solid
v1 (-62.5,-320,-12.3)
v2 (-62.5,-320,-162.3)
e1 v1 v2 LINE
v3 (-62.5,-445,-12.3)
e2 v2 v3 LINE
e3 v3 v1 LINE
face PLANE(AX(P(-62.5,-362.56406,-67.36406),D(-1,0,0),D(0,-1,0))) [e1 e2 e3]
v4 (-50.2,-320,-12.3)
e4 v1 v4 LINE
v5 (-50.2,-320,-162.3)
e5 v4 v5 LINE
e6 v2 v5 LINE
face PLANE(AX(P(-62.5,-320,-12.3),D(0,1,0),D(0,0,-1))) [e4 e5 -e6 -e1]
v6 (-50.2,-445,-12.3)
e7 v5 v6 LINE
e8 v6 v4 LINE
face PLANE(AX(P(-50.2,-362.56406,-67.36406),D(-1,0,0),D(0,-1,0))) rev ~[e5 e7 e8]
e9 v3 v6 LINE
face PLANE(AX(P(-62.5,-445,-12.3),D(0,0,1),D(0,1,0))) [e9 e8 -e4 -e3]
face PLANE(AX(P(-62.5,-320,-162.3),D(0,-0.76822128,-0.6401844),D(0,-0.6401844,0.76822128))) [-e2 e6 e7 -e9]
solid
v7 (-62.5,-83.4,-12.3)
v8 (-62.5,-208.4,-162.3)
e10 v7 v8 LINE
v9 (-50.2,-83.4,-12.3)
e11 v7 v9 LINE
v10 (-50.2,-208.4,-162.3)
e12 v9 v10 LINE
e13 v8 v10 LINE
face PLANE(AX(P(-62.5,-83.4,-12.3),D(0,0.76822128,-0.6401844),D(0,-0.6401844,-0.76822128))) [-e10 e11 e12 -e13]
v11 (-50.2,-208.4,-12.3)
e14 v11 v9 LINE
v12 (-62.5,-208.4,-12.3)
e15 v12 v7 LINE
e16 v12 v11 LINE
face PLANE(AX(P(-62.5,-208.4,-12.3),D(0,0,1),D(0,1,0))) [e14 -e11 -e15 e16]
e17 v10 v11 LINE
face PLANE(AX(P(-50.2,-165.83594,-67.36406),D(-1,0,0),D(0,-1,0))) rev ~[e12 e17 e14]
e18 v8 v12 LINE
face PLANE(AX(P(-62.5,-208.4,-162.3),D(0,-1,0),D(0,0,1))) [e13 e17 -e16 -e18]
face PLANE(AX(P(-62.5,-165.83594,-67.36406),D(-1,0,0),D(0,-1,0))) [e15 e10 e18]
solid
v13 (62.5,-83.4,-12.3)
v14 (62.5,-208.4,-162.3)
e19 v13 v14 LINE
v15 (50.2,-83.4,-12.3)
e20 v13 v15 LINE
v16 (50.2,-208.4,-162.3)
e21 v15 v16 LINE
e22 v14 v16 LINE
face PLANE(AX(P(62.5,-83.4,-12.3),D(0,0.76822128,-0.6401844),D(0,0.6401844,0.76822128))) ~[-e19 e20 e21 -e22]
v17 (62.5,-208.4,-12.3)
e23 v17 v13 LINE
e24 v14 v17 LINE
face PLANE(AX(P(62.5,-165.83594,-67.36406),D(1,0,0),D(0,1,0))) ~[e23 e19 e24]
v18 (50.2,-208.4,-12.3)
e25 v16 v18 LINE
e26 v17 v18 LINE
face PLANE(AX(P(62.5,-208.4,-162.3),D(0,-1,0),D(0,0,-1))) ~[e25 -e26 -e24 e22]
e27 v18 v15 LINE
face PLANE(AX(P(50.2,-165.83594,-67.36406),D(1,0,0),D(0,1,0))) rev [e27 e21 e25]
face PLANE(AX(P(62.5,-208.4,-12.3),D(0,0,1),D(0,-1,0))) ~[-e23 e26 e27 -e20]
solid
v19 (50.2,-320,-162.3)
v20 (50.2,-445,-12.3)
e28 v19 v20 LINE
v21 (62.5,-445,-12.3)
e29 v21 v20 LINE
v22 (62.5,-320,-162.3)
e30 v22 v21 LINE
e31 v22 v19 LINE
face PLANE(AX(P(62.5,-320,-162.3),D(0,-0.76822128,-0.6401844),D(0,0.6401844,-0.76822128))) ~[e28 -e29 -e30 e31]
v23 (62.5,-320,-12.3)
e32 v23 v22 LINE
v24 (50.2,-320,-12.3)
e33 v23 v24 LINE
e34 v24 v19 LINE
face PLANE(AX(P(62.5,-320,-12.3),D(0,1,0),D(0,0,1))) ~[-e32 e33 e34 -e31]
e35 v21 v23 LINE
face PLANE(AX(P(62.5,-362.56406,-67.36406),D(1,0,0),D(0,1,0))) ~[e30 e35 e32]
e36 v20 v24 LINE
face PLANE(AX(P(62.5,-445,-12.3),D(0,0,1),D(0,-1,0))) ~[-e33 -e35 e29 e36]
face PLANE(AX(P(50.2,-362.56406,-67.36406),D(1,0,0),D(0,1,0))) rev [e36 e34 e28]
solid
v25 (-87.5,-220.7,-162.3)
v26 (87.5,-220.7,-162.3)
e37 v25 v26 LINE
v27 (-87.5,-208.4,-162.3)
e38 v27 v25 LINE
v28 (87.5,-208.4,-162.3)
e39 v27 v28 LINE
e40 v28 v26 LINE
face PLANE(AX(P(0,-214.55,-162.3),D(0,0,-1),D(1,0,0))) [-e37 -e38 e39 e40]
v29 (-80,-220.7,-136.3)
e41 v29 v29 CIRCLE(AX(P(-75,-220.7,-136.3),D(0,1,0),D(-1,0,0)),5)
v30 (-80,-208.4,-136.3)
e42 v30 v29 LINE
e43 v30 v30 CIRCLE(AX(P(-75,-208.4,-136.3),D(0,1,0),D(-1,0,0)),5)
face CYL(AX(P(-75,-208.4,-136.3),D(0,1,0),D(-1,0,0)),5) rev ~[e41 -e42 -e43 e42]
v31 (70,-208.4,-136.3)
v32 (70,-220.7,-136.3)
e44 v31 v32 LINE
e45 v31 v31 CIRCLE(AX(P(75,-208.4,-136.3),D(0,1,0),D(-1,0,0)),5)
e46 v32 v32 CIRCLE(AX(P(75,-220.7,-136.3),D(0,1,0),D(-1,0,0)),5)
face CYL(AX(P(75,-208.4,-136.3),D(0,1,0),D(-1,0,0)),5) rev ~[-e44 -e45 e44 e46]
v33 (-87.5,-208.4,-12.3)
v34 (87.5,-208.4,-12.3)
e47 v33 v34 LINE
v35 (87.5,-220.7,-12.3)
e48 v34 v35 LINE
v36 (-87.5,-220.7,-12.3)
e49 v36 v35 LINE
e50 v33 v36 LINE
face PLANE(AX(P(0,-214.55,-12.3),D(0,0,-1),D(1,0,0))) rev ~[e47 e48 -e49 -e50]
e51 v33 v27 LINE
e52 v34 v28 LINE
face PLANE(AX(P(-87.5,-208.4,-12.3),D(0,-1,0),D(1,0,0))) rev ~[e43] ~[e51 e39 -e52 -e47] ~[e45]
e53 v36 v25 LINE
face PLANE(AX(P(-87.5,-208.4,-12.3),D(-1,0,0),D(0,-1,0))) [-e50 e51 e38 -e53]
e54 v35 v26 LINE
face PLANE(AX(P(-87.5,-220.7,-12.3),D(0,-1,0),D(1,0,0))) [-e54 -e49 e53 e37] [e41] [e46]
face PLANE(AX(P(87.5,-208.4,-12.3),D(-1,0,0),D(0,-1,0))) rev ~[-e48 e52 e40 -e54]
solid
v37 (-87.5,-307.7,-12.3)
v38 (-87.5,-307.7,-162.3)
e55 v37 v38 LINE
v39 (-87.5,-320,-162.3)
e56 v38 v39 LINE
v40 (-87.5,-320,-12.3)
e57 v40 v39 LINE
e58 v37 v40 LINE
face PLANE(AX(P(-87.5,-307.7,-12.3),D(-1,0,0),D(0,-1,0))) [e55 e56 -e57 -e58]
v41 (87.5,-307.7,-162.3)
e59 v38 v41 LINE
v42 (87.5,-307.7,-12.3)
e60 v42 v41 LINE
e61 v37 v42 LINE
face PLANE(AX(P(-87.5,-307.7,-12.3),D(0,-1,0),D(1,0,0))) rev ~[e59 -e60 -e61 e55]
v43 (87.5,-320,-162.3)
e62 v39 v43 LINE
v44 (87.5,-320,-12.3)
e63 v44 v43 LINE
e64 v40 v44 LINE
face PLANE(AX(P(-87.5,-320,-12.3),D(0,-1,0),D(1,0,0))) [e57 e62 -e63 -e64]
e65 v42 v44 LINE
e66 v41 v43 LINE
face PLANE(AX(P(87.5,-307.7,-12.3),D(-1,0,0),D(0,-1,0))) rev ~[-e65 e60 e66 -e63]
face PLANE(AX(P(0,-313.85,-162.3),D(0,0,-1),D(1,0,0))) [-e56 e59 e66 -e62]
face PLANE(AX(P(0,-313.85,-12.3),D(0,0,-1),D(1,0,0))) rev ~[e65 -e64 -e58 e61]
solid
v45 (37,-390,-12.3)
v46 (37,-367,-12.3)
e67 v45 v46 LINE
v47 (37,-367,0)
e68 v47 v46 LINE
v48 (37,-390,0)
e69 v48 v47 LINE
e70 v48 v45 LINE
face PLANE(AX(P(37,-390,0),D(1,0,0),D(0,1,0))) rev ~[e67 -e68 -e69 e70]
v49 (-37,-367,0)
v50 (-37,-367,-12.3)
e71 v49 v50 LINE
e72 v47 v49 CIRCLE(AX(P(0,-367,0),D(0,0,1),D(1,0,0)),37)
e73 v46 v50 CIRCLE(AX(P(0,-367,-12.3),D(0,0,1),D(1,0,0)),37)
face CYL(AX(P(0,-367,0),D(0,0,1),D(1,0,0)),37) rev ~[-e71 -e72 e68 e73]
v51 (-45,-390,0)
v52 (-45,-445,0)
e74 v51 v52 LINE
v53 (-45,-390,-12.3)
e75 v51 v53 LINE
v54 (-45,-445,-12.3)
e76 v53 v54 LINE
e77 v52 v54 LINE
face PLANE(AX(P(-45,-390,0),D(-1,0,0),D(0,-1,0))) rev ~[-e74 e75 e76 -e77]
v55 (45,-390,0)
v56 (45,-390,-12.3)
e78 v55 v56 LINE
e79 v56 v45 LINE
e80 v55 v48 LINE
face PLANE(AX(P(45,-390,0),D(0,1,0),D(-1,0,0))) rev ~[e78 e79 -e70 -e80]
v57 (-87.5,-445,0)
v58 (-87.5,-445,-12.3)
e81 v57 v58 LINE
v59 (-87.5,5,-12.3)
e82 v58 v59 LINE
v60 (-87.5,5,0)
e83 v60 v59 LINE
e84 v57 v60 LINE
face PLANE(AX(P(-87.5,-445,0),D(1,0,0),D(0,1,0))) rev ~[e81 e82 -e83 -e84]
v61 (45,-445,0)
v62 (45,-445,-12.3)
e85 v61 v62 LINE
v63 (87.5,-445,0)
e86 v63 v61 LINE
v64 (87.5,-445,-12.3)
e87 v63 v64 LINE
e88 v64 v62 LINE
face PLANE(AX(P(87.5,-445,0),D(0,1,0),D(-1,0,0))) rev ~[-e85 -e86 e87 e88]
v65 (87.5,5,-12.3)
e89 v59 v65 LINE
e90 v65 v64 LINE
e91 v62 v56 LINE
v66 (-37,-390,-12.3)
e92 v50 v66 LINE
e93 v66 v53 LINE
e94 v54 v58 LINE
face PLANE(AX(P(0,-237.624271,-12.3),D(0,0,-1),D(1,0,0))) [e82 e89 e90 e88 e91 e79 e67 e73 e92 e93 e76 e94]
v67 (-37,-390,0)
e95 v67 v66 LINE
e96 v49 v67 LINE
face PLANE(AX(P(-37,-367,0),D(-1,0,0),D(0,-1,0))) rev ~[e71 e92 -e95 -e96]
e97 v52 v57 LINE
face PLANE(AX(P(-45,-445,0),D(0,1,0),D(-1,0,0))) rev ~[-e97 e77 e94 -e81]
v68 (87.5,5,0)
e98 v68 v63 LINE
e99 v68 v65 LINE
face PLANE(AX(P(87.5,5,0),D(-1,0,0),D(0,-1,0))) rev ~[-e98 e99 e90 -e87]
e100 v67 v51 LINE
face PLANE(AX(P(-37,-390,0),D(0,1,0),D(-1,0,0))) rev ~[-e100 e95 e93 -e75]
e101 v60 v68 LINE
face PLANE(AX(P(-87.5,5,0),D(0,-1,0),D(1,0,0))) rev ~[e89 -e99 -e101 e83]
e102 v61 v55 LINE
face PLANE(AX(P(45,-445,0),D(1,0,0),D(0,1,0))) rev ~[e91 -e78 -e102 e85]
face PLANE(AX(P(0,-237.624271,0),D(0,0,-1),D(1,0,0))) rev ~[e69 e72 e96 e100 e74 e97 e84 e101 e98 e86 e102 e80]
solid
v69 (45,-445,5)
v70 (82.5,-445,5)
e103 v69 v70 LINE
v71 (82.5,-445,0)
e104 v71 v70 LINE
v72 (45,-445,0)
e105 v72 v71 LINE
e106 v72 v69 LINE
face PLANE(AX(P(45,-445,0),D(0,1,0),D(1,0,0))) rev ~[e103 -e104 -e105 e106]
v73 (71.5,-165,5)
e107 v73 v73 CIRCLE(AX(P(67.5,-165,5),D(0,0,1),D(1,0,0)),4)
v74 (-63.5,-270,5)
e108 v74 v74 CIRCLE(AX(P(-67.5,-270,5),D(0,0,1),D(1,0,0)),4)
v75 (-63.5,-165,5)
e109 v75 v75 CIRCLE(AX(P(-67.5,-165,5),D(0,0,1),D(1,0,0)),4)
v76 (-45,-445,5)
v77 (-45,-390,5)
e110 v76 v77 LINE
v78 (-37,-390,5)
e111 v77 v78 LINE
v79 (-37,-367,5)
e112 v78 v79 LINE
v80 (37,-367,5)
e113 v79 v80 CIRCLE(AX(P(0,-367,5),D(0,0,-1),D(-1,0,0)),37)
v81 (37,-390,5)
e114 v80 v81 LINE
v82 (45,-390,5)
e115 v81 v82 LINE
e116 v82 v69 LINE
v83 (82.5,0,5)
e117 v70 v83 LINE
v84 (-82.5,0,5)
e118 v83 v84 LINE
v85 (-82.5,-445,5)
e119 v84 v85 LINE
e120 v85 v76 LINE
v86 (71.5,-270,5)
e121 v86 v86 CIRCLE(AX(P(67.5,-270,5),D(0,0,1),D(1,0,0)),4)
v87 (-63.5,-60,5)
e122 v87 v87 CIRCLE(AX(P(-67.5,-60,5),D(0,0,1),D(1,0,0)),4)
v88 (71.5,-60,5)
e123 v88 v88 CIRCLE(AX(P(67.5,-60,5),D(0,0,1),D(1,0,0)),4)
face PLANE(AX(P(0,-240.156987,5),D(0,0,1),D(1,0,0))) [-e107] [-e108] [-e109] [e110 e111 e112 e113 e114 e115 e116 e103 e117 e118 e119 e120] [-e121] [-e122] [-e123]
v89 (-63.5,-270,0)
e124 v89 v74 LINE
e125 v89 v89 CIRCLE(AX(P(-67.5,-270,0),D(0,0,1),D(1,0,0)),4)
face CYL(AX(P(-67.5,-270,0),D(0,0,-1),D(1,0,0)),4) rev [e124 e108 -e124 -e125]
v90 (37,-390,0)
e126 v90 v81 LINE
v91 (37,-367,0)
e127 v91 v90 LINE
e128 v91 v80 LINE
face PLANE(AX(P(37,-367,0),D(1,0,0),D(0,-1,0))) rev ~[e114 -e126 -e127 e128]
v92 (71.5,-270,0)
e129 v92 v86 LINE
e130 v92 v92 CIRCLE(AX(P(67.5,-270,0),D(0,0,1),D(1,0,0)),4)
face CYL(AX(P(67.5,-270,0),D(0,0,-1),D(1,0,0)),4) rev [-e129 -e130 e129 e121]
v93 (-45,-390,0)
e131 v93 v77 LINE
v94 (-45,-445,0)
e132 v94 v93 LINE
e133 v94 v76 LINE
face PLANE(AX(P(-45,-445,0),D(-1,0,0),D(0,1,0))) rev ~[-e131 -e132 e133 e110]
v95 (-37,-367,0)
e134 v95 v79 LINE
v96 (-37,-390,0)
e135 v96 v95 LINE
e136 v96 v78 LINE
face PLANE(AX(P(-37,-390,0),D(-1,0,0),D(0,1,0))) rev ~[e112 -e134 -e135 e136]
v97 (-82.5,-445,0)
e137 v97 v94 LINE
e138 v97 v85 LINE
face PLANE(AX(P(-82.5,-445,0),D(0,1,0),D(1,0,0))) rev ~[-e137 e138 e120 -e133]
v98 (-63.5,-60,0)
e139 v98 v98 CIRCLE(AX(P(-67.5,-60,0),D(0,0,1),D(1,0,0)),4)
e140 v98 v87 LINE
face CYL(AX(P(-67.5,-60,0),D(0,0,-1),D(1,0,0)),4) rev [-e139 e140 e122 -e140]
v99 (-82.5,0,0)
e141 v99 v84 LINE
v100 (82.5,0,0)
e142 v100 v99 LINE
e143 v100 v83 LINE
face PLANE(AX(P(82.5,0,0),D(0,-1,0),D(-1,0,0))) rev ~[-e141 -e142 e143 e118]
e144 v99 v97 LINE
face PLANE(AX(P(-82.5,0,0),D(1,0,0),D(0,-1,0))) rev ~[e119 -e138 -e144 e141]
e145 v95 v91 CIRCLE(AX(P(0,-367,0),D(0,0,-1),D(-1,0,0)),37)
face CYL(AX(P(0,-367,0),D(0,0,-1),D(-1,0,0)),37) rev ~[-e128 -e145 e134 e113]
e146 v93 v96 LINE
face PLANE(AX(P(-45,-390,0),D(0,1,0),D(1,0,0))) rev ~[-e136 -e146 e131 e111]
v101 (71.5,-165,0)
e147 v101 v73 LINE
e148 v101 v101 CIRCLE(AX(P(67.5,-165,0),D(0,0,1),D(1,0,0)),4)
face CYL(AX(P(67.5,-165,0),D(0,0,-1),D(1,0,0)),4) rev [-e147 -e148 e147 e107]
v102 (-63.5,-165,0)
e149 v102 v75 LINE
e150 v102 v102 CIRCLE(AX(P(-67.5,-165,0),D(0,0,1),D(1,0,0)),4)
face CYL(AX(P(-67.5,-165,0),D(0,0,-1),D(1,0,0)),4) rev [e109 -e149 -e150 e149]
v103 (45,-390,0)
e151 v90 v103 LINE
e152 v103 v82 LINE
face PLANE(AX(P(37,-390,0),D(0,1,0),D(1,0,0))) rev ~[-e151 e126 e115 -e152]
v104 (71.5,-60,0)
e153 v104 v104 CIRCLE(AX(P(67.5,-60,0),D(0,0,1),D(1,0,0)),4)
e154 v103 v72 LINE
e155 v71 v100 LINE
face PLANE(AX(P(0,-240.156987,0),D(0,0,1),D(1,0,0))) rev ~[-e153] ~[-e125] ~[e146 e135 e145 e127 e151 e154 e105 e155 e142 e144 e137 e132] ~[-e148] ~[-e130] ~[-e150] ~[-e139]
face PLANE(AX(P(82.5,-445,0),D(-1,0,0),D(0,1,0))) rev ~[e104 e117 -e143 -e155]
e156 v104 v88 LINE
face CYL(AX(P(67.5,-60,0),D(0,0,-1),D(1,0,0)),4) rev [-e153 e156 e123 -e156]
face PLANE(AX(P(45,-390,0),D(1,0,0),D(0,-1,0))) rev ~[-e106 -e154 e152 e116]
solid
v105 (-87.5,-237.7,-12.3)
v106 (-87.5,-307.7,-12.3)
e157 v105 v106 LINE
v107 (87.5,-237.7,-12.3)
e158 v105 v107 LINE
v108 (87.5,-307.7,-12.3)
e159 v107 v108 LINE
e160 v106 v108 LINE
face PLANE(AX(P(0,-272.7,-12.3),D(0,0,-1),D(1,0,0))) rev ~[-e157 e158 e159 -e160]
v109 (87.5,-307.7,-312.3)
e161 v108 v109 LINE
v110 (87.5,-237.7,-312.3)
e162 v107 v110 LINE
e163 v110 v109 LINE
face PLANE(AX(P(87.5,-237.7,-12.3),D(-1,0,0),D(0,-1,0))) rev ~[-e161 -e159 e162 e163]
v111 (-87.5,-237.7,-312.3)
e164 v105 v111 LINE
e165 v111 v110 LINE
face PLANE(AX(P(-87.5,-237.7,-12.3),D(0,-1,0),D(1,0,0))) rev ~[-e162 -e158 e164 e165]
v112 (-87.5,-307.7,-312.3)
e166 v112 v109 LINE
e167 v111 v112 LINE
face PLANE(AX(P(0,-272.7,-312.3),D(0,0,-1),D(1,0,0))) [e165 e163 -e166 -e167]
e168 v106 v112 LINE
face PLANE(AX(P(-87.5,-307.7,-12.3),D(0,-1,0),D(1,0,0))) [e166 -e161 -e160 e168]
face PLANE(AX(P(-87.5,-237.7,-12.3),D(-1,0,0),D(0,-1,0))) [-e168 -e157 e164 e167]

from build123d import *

# Parameters (mm, degrees)
F1_R      = 4
F2_DEPTH  = 5
F4_DEPTH  = 12.3
F5_W      = 175
F5_H      = 70
F6_DEPTH  = 300
F7_W      = 175
F7_H      = 12.3
F8_DEPTH  = 150
F11_DEPTH = 12.3
F15_R     = 5
F16_DEPTH = 12.3


# Not quite as in the source:
# - a feature of the source that left no trace in its solid (it failed there, or was rolled back) is left out


with BuildPart() as f2:
    # F1 (on Top) → F2 (new body)
    with BuildSketch(Plane.XY):
        with BuildLine():
            Line((82.5, 0), (-82.5, 0))
            Line((-82.5, 0), (-82.5, -445))
            Line((-82.5, -445), (-45, -445))
            Line((-45, -445), (-45, -390))
            Line((-45, -390), (-37, -390))
            Line((-37, -390), (-37, -367))
            ThreePointArc((-37, -367), (0, -330), (37, -367))
            Line((37, -367), (37, -390))
            Line((37, -390), (45, -390))
            Line((45, -390), (45, -445))
            Line((45, -445), (82.5, -445))
            Line((82.5, -445), (82.5, 0))
        make_face()
        with Locations((-67.5, -270)):
            Circle(F1_R, mode=Mode.SUBTRACT)
        with Locations((67.5, -270)):
            Circle(F1_R, mode=Mode.SUBTRACT)
        with Locations((-67.5, -165)):
            Circle(F1_R, mode=Mode.SUBTRACT)
        with Locations((-67.5, -60)):
            Circle(F1_R, mode=Mode.SUBTRACT)
        with Locations((67.5, -165)):
            Circle(F1_R, mode=Mode.SUBTRACT)
        with Locations((67.5, -60)):
            Circle(F1_R, mode=Mode.SUBTRACT)
    extrude(amount=F2_DEPTH)


with BuildPart() as f4:
    # F3 (on face) → F4 (new body)
    with BuildSketch(Plane(origin=(0, 0, 0), x_dir=(1, 0, 0), z_dir=(0, 0, -1))):
        with BuildLine():
            Line((-87.5, 445), (-87.5, -5))
            Line((-87.5, -5), (87.5, -5))
            Line((87.5, -5), (87.5, 445))
            Line((87.5, 445), (45, 445))
            Line((45, 445), (45, 390))
            Line((45, 390), (37, 390))
            Line((37, 390), (37, 367))
            ThreePointArc((37, 367), (0, 330), (-37, 367))
            Line((-37, 367), (-37, 390))
            Line((-37, 390), (-45, 390))
            Line((-45, 390), (-45, 445))
            Line((-45, 445), (-87.5, 445))
        make_face()
    extrude(amount=F4_DEPTH)


with BuildPart() as f6:
    # F5 (on face) → F6 (new body)
    with BuildSketch(Plane(origin=(0, 0, -12.3), x_dir=(1, 0, 0), z_dir=(0, 0, -1))):
        with Locations((0, 272.7)):
            Rectangle(F5_W, F5_H)
    extrude(amount=F6_DEPTH)


with BuildPart() as f8:
    # F7 (on face) → F8 (new body)
    with BuildSketch(Plane(origin=(0, 0, -12.3), x_dir=(1, 0, 0), z_dir=(0, 0, -1))):
        with Locations((0, 313.85)):
            Rectangle(F7_W, F7_H)
    extrude(amount=F8_DEPTH)


with BuildPart() as f8b:
    # F7 (on face) → F8, piece 2 (new body)
    with BuildSketch(Plane(origin=(0, 0, -12.3), x_dir=(1, 0, 0), z_dir=(0, 0, -1))):
        with Locations((0, 214.55)):
            Rectangle(F7_W, F7_H)
    extrude(amount=F8_DEPTH)

    # F15 (on face) → F16 (cut, through all)
    with BuildSketch(Plane(origin=(0, -208.4, 0), x_dir=(-1, 0, 0), z_dir=(0, 1, 0))):
        with Locations((75, -136.3)):
            Circle(F15_R)
        with Locations((-75, -136.3)):
            Circle(F15_R)
    extrude(amount=-F16_DEPTH, mode=Mode.SUBTRACT)


with BuildPart() as f11:
    # F10 (on offset) → F11 (new body)
    with BuildSketch(Plane(origin=(-62.5, 0, 0), x_dir=(0, -1, 0), z_dir=(-1, 0, 0))):
        Polygon((320, -162.3), (445, -12.3), (320, -12.3), align=None)
    extrude(amount=-F11_DEPTH)


with BuildPart() as f11b:
    # F10 (on offset) → F11, piece 2 (new body)
    with BuildSketch(Plane(origin=(-62.5, 0, 0), x_dir=(0, -1, 0), z_dir=(-1, 0, 0))):
        Polygon((83.4, -12.3), (208.4, -162.3), (208.4, -12.3), align=None)
    extrude(amount=-F11_DEPTH)


with BuildPart() as f12_1:
    # F12: instance of F11b
    add(f11b.part.mirror(Plane.YZ))


with BuildPart() as f12_2:
    # F12: instance of F11
    add(f11.part.mirror(Plane.YZ))


solid = Compound([f2.part, f4.part, f6.part, f8.part, f8b.part, f11.part, f11b.part, f12_1.part, f12_2.part])
